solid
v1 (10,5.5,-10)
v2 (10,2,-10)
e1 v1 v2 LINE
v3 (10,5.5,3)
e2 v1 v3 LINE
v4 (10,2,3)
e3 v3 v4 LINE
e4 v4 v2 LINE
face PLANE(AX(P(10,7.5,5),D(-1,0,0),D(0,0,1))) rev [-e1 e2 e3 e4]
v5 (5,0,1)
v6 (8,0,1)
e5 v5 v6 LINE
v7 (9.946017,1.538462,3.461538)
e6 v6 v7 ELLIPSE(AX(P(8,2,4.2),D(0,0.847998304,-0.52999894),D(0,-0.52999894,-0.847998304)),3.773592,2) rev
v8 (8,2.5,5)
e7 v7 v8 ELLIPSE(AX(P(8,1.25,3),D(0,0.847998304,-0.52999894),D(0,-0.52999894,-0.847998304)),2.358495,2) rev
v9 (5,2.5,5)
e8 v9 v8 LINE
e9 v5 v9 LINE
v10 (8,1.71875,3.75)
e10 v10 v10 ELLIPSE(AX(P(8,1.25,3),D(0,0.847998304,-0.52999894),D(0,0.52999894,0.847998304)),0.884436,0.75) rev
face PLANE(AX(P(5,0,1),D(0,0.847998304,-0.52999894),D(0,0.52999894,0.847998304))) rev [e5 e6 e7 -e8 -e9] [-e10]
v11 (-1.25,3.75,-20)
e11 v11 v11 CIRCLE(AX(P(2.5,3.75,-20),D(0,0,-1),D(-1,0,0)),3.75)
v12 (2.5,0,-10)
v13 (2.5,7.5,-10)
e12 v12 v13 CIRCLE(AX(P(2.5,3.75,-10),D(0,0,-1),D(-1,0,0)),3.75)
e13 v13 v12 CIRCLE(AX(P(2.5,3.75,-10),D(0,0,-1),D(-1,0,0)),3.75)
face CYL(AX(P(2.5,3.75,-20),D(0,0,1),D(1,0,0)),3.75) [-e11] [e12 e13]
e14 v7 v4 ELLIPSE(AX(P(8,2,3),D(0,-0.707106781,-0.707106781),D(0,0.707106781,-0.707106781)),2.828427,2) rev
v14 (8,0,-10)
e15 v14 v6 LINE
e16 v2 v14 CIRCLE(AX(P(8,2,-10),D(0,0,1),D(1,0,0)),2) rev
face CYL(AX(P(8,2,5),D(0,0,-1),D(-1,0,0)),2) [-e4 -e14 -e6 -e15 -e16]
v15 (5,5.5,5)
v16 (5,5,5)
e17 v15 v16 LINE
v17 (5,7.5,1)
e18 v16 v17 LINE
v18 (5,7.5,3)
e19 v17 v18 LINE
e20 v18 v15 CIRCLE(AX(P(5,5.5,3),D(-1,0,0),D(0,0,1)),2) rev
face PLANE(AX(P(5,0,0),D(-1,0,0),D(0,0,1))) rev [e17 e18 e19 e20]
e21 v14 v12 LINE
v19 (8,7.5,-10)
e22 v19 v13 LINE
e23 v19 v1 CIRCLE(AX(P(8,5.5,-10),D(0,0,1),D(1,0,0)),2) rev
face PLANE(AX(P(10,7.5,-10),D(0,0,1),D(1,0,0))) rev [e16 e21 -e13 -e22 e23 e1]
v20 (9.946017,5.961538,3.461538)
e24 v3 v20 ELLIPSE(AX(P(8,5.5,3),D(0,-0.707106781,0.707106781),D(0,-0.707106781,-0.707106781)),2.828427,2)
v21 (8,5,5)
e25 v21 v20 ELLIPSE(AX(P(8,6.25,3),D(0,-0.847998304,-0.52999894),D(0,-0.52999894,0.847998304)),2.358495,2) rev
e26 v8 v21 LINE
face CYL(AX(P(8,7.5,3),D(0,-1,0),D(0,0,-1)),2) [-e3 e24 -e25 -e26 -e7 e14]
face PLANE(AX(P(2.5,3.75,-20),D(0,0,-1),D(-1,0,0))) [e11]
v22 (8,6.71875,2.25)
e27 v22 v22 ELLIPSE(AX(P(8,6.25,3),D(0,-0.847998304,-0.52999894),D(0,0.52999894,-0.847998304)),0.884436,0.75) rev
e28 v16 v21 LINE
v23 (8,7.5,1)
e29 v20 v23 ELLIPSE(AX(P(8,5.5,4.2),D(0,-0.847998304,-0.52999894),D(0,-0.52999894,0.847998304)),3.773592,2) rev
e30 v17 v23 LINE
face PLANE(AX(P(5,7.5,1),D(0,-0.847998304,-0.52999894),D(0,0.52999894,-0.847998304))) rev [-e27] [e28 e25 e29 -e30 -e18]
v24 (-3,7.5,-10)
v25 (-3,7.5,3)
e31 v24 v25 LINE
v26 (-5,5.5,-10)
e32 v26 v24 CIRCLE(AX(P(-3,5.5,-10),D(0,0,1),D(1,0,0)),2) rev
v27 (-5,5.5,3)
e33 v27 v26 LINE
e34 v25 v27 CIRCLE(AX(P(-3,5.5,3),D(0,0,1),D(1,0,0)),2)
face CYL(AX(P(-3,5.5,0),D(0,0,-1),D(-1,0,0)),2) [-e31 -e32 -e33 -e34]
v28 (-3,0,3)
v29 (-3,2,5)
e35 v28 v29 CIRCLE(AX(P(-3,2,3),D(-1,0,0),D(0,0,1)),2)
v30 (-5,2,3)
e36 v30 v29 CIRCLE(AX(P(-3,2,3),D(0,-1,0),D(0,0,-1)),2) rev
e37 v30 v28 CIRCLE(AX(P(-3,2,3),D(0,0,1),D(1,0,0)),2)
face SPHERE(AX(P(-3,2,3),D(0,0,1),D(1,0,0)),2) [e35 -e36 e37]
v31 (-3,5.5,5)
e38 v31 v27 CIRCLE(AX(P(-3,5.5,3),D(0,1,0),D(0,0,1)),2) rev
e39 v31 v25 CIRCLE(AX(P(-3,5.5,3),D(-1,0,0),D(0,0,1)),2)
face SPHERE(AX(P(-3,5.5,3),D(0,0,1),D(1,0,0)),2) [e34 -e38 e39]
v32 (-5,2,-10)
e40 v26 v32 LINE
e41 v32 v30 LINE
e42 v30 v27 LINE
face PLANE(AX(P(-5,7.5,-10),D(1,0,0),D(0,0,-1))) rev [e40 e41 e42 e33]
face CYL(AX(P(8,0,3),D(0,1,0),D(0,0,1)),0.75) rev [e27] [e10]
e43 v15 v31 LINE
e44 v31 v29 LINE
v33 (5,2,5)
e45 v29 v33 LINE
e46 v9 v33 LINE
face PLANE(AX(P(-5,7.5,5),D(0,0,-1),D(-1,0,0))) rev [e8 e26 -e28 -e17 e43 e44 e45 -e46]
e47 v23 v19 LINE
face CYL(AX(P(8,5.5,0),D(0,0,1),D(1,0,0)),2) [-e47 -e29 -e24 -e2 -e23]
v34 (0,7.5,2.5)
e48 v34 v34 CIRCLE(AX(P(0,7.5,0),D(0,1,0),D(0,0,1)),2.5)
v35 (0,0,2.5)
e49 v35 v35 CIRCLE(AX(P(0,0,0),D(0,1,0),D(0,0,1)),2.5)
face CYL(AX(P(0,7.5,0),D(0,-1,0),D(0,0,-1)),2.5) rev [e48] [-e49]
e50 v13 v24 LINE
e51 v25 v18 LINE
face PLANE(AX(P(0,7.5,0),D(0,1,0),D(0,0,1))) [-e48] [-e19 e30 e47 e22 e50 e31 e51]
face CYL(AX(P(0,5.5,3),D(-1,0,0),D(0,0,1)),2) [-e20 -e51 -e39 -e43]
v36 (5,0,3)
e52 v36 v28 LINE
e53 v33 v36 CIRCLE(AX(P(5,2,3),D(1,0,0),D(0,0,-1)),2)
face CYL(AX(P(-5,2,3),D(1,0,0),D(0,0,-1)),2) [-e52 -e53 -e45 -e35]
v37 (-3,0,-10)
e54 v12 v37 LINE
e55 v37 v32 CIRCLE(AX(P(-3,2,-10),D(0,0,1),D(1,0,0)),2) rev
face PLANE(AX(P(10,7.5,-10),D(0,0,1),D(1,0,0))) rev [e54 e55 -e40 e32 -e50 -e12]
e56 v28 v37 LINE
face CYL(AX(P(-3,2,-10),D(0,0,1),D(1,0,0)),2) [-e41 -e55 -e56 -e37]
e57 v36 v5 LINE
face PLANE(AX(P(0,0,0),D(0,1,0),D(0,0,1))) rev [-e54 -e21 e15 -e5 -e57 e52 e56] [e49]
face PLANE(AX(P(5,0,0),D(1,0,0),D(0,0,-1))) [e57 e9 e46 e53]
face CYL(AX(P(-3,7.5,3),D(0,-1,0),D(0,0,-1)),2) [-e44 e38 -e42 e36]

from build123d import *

# Parameters (mm, degrees)
SKETCH1_W           = 15
SKETCH1_H           = 15
SKETCH1_R           = 2.5
BOSS_EXTRUDE1_DEPTH = 7.5
SKETCH2_R           = 3.75
BOSS_EXTRUDE2_DEPTH = 10
SKETCH3_R           = 0.75
CUT_EXTRUDE1_DEPTH  = 7.5
CUT_EXTRUDE2_DEPTH  = 5
FILLET1_R           = 2


with BuildPart() as part:
    # Sketch1 → Boss-Extrude1 (new body)
    with BuildSketch(Plane(origin=(0, 0, 0), x_dir=(1, 0, 0), z_dir=(0, 1, 0))):
        with Locations((2.5, 2.5)):
            Rectangle(SKETCH1_W, SKETCH1_H)
        with Locations(Location((0, 0, 0), (0, 0, 270))):
            Circle(SKETCH1_R, mode=Mode.SUBTRACT)
    extrude(amount=BOSS_EXTRUDE1_DEPTH)

    # Sketch2 → Boss-Extrude2 (add)
    with BuildSketch(Plane(origin=(0, 0, -10), x_dir=(-1, 0, 0), z_dir=(0, 0, -1))):
        with Locations(Location((-2.5, 3.75, 0), (0, 0, 270))):
            Circle(SKETCH2_R)
    extrude(amount=BOSS_EXTRUDE2_DEPTH)

    # Sketch3 → Cut-Extrude1 (cut)
    with BuildSketch(Plane(origin=(0, 7.5, 0), x_dir=(1, 0, 0), z_dir=(0, 1, 0))):
        with Locations(Location((8, -3, 0), (0, 0, 270))):
            Circle(SKETCH3_R)
    extrude(amount=-CUT_EXTRUDE1_DEPTH, mode=Mode.SUBTRACT)

    # Sketch4 → Cut-Extrude2 (cut)
    with BuildSketch(Plane(origin=(10, 0, 0), x_dir=(0, 0, -1), z_dir=(1, 0, 0))):
        Polygon((-5, 7.5), (-1, 7.5), (-5, 5), align=None)
        Polygon((-5, 0), (-1, 0), (-5, 2.5), align=None)
    extrude(amount=-CUT_EXTRUDE2_DEPTH, mode=Mode.SUBTRACT)

    # Fillet1
    # the kernel refuses this fillet: 2 mm, written as the material it takes off along each edge
    with BuildSketch(Plane(origin=(-3, 2, 3), x_dir=(-1, 0, 0), z_dir=(0, 0, 1))) as fillet1_piece_1_section:
        Polygon((0, 0), (FILLET1_R, 0), (FILLET1_R, FILLET1_R), (0, FILLET1_R), align=None)
    fillet1_piece_1 = extrude(amount=FILLET1_R, mode=Mode.PRIVATE)
    fillet1_piece_1 = fillet1_piece_1 - Plane(origin=(-3, 2, 3), x_dir=(0.7071067811865475, 0.7071067811865475, 0), z_dir=(0, 0, 1)) * Sphere(FILLET1_R, mode=Mode.PRIVATE)
    add(fillet1_piece_1, mode=Mode.SUBTRACT)
    with BuildSketch(Plane(origin=(-3, 5.5, 3), x_dir=(-1, 0, 0), z_dir=(0, 0, 1))) as fillet1_piece_2_section:
        Polygon((0, 0), (FILLET1_R, 0), (FILLET1_R, -FILLET1_R), (0, -FILLET1_R), align=None)
    fillet1_piece_2 = extrude(amount=FILLET1_R, mode=Mode.PRIVATE)
    fillet1_piece_2 = fillet1_piece_2 - Plane(origin=(-3, 5.5, 3), x_dir=(0.7071067811865475, -0.7071067811865475, 0), z_dir=(0, 0, 1)) * Sphere(FILLET1_R, mode=Mode.PRIVATE)
    add(fillet1_piece_2, mode=Mode.SUBTRACT)
    with BuildSketch(Plane(origin=(10, -2.5, 5), x_dir=(-1, 0, 0), z_dir=(0, 1, 0))) as fillet1_piece_3:
        with BuildLine():
            CenterArc((FILLET1_R, -FILLET1_R), FILLET1_R, 90, 90)
            Line((0, -FILLET1_R), (0, 0))
            Line((0, 0), (FILLET1_R, 0))
        make_face()
    extrude(amount=12.5, mode=Mode.SUBTRACT)
    with BuildSketch(Plane(origin=(-5, 2, 5), x_dir=(1, 0, 0), z_dir=(0, 1, 0))) as fillet1_piece_4:
        with BuildLine():
            CenterArc((FILLET1_R, FILLET1_R), FILLET1_R, 180, 90)
            Line((0, FILLET1_R), (0, 0))
            Line((0, 0), (FILLET1_R, 0))
        make_face()
    extrude(amount=3.5, mode=Mode.SUBTRACT)
    with BuildSketch(Plane(origin=(-5, 0, -15), x_dir=(1, 0, 0), z_dir=(0, 0, 1))) as fillet1_piece_5:
        with BuildLine():
            CenterArc((FILLET1_R, FILLET1_R), FILLET1_R, 180, 90)
            Line((0, FILLET1_R), (0, 0))
            Line((0, 0), (FILLET1_R, 0))
        make_face()
    extrude(amount=18, mode=Mode.SUBTRACT)
    with BuildSketch(Plane(origin=(-5, 7.5, -15), x_dir=(1, 0, 0), z_dir=(0, 0, 1))) as fillet1_piece_6:
        with BuildLine():
            CenterArc((FILLET1_R, -FILLET1_R), FILLET1_R, 90, 90)
            Line((0, -FILLET1_R), (0, 0))
            Line((0, 0), (FILLET1_R, 0))
        make_face()
    extrude(amount=18, mode=Mode.SUBTRACT)
    with BuildSketch(Plane(origin=(-3, 0, 5), x_dir=(0, 1, 0), z_dir=(1, 0, 0))) as fillet1_piece_7:
        with BuildLine():
            CenterArc((FILLET1_R, -FILLET1_R), FILLET1_R, 90, 90)
            Line((0, -FILLET1_R), (0, 0))
            Line((0, 0), (FILLET1_R, 0))
        make_face()
    extrude(amount=13, mode=Mode.SUBTRACT)
    with BuildSketch(Plane(origin=(10, 0, 6), x_dir=(-1, 0, 0), z_dir=(0, 0, -1)), Plane(origin=(10, 7.5, 6), x_dir=(0, -1, 0), z_dir=(0, 0, -1))) as fillet1_piece_8:
        with BuildLine():
            CenterArc((FILLET1_R, FILLET1_R), FILLET1_R, 180, 90)
            Line((0, FILLET1_R), (0, 0))
            Line((0, 0), (FILLET1_R, 0))
        make_face()
    extrude(amount=21, mode=Mode.SUBTRACT)
    with BuildSketch(Plane(origin=(-3, 7.5, 5), x_dir=(0, -1, 0), z_dir=(1, 0, 0))) as fillet1_piece_9:
        with BuildLine():
            CenterArc((FILLET1_R, FILLET1_R), FILLET1_R, 180, 90)
            Line((0, FILLET1_R), (0, 0))
            Line((0, 0), (FILLET1_R, 0))
        make_face()
    extrude(amount=13, mode=Mode.SUBTRACT)


solid = part.part
